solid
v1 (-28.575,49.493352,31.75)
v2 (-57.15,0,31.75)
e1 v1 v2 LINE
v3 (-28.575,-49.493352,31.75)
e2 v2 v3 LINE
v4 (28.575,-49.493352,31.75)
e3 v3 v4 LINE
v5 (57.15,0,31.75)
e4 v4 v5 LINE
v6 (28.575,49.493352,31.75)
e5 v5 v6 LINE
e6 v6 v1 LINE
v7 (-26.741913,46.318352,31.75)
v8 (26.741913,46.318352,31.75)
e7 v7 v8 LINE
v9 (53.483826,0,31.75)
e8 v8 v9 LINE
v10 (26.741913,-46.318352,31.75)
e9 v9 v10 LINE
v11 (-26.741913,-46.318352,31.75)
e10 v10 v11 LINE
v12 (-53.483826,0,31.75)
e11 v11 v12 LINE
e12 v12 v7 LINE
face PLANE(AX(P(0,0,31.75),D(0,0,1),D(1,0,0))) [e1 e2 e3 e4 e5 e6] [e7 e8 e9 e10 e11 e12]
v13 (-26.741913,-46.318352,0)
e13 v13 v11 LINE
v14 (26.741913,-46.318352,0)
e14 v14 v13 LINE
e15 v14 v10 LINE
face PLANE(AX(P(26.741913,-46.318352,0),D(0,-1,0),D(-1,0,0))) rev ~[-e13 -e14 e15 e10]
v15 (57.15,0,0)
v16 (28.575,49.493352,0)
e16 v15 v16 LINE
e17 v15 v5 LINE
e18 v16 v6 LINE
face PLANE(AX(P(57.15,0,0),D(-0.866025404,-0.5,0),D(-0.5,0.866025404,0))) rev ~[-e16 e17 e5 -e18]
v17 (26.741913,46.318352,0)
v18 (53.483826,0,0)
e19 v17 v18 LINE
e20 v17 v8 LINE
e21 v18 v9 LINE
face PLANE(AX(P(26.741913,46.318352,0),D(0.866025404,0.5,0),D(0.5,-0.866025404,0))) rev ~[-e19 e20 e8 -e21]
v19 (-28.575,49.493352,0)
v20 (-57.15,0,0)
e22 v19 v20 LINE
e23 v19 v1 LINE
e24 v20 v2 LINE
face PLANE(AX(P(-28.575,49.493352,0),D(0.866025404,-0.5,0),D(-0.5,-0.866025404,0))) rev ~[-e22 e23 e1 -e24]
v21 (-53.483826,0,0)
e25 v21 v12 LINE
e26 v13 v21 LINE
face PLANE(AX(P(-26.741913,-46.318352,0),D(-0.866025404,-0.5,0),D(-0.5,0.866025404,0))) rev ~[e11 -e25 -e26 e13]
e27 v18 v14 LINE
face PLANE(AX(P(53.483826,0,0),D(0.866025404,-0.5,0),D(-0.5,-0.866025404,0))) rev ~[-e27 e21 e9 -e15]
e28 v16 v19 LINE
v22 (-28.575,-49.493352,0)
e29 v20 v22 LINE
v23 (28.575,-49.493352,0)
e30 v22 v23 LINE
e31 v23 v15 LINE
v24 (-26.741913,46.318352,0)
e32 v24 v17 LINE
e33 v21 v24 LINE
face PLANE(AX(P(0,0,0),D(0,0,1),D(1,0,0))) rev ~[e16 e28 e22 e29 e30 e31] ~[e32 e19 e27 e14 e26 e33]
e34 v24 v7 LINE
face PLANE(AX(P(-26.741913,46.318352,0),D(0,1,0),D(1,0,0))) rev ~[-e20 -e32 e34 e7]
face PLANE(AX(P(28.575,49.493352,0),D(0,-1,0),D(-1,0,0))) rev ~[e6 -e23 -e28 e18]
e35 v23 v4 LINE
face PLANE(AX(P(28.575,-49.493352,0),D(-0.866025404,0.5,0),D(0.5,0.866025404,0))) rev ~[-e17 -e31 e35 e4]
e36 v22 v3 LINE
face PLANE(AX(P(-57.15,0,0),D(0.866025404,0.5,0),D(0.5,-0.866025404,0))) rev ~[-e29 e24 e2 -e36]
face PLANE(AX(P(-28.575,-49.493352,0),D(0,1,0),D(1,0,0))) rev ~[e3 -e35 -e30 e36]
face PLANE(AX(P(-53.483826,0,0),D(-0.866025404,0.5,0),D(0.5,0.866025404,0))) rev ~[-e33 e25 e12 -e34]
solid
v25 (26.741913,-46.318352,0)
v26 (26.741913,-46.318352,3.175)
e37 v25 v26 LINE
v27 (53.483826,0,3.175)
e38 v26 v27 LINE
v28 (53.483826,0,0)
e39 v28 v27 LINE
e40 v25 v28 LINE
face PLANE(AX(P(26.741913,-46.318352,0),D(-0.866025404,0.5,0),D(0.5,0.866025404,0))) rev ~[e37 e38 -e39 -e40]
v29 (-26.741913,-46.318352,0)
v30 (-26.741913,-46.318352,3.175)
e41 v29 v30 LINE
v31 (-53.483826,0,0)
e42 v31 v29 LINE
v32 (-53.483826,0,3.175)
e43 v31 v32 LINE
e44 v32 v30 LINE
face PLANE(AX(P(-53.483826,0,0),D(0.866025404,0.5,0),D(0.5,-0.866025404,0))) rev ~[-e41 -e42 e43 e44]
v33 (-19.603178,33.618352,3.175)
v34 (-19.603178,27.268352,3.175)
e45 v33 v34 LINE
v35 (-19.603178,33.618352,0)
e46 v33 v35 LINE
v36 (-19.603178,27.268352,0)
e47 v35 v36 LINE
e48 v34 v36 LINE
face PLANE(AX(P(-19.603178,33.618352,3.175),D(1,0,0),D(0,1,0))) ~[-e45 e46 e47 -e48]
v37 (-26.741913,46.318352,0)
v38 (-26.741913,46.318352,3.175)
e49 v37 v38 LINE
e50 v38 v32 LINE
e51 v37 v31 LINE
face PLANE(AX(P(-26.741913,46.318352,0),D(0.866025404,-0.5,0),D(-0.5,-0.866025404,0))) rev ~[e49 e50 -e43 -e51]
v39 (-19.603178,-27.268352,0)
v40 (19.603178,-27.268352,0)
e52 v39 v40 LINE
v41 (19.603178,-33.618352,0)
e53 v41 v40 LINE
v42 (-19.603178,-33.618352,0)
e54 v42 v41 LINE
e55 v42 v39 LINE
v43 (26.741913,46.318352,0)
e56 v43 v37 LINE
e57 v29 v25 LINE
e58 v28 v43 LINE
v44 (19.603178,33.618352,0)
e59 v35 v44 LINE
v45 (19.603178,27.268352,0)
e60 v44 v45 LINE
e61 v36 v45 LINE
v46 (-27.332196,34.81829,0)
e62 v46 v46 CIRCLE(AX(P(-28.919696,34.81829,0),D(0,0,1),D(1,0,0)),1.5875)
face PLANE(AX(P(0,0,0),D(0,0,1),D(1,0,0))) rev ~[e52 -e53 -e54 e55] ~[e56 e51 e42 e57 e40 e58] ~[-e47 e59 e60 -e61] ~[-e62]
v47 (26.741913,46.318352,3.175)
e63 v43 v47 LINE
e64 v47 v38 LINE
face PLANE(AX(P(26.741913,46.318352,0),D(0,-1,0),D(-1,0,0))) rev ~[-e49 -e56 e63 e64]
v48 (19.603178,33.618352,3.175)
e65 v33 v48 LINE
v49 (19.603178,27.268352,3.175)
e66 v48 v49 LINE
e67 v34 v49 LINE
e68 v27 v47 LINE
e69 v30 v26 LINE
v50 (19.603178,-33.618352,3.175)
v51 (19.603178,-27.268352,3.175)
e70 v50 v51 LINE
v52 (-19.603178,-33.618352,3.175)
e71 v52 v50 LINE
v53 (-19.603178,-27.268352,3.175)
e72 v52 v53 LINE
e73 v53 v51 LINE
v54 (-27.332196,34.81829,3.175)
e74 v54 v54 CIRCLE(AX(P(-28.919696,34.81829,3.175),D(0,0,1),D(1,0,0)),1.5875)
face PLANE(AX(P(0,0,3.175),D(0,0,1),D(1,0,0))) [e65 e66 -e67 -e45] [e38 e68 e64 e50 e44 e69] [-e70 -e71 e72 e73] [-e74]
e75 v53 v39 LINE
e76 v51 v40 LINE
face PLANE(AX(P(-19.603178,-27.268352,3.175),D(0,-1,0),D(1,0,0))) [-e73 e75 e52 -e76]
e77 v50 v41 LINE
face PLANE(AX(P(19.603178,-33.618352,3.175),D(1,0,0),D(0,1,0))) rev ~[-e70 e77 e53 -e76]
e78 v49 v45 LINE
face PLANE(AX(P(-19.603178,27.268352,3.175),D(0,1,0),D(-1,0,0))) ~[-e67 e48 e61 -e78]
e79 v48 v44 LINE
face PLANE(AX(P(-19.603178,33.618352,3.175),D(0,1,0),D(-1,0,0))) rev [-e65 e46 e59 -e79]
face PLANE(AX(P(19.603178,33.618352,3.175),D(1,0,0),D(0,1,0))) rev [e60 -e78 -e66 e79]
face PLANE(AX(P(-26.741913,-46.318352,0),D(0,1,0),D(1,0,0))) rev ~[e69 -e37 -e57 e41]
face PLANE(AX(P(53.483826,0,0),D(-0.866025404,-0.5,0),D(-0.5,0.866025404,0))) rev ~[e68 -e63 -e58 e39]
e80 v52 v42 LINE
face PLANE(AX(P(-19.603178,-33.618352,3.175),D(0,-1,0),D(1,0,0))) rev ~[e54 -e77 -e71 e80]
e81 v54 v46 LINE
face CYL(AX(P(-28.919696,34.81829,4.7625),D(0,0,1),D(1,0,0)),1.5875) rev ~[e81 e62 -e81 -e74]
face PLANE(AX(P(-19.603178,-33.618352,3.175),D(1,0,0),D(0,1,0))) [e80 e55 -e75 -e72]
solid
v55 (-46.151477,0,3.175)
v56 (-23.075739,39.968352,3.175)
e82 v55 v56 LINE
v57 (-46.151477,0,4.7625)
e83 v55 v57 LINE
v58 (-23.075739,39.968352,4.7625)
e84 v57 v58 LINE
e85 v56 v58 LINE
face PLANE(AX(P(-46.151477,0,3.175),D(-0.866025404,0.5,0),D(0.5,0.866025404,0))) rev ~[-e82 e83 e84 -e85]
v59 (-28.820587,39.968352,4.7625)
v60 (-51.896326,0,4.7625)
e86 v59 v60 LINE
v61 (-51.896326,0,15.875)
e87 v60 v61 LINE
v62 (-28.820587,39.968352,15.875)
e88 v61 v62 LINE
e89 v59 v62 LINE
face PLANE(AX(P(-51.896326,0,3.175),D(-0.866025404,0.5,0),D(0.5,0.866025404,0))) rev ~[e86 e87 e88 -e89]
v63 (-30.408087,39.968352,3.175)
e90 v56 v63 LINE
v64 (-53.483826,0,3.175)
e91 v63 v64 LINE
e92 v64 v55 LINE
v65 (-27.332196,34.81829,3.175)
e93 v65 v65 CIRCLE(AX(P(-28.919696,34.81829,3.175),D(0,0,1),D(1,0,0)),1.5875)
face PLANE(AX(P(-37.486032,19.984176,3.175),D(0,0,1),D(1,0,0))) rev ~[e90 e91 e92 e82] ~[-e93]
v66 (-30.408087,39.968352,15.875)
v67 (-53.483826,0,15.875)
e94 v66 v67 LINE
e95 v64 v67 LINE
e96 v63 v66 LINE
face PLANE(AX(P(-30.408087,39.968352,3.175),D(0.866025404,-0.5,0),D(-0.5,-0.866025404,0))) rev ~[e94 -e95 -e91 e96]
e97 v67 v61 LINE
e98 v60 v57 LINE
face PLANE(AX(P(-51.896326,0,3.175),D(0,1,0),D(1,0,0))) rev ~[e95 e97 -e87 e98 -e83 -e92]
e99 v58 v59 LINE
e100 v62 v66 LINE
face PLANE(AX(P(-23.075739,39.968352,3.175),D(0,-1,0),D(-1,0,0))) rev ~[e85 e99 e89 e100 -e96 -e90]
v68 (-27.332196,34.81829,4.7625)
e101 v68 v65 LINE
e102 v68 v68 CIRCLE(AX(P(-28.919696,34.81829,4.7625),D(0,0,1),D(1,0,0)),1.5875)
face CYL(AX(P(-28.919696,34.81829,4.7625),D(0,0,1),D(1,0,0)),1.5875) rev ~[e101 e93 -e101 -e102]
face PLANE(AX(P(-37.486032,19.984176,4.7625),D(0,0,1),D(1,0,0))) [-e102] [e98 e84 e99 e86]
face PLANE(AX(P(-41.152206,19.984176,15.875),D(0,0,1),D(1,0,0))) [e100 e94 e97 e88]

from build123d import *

# Parameters (mm, degrees)
F1_DEPTH = 3.175
F2_W     = 39.2063558102
F2_H     = 6.35
F3_DEPTH = 25.4
F4_DEPTH = 31.75
F6_DEPTH = 12.7
F7_DEPTH = 1.5875
F8_R     = 1.5875
F9_DEPTH = 25.4


# Not quite as in the source:
# - a pattern or mirror of a feature is missing from the dataset's text; its kind, count and spacing are read off the source's solid


with BuildPart() as f1:
    # F0 (on Top) → F1 (new body)
    with BuildSketch(Plane.XY):
        Polygon((-26.7419128953, 46.3183518263), (-53.4838257906, 0), (-26.7419128953, -46.3183518263), (26.7419128953, -46.3183518263), (53.4838257906, 0), (26.7419128953, 46.3183518263), align=None)
    extrude(amount=F1_DEPTH)

    # F2 (on face) → F3 (cut)
    with BuildSketch(Plane.XY.offset(3.175)):
        with Locations((0, -30.4433518263)):
            Rectangle(F2_W, F2_H)
    f3 = extrude(amount=-F3_DEPTH, mode=Mode.SUBTRACT)

    # F3_copies: F3 across plane
    add(f3.mirror(Plane.ZX), mode=Mode.SUBTRACT)


with BuildPart() as f4:
    # F0 (on Top) → F4 (new body)
    with BuildSketch(Plane.XY):
        Polygon((28.575, 49.4933518263), (-28.575, 49.4933518263), (-57.15, 0), (-28.575, -49.4933518263), (28.575, -49.4933518263), (57.15, 0), align=None)
        Polygon((-26.7419128953, -46.3183518263), (-53.4838257906, 0), (-26.7419128953, 46.3183518263), (26.7419128953, 46.3183518263), (53.4838257906, 0), (26.7419128953, -46.3183518263), align=None, mode=Mode.SUBTRACT)
    extrude(amount=F4_DEPTH)


with BuildPart() as f6:
    # F5 (on face) → F6 (new body)
    with BuildSketch(Plane.XY.offset(3.175)):
        Polygon((-51.8963257906, 0), (-28.8205871047, 39.9683518263), (-30.4080871047, 39.9683518263), (-53.4838257906, 0), align=None)
    extrude(amount=F6_DEPTH)

    # F5 (on face) → F7 (join)
    with BuildSketch(Plane.XY.offset(3.175)):
        Polygon((-46.1514773719, 0), (-23.075738686, 39.9683518263), (-28.8205871047, 39.9683518263), (-51.8963257906, 0), align=None)
    extrude(amount=F7_DEPTH)


with BuildPart() as f9_tool:
    # F8 (on face) → F9 (new body)
    with BuildSketch(Plane.XY.offset(4.7625)):
        with Locations((-28.9196960247, 34.8182901413)):
            Circle(F8_R)
    extrude(amount=-F9_DEPTH)


with BuildPart() as f1_1:
    add(f1.part)

    # F9: cut by f9_tool
    add(f9_tool.part, mode=Mode.SUBTRACT)


with BuildPart() as f6_1:
    add(f6.part)

    # F9: cut by f9_tool
    add(f9_tool.part, mode=Mode.SUBTRACT)


solid = Compound([f4.part, f1_1.part, f6_1.part])
